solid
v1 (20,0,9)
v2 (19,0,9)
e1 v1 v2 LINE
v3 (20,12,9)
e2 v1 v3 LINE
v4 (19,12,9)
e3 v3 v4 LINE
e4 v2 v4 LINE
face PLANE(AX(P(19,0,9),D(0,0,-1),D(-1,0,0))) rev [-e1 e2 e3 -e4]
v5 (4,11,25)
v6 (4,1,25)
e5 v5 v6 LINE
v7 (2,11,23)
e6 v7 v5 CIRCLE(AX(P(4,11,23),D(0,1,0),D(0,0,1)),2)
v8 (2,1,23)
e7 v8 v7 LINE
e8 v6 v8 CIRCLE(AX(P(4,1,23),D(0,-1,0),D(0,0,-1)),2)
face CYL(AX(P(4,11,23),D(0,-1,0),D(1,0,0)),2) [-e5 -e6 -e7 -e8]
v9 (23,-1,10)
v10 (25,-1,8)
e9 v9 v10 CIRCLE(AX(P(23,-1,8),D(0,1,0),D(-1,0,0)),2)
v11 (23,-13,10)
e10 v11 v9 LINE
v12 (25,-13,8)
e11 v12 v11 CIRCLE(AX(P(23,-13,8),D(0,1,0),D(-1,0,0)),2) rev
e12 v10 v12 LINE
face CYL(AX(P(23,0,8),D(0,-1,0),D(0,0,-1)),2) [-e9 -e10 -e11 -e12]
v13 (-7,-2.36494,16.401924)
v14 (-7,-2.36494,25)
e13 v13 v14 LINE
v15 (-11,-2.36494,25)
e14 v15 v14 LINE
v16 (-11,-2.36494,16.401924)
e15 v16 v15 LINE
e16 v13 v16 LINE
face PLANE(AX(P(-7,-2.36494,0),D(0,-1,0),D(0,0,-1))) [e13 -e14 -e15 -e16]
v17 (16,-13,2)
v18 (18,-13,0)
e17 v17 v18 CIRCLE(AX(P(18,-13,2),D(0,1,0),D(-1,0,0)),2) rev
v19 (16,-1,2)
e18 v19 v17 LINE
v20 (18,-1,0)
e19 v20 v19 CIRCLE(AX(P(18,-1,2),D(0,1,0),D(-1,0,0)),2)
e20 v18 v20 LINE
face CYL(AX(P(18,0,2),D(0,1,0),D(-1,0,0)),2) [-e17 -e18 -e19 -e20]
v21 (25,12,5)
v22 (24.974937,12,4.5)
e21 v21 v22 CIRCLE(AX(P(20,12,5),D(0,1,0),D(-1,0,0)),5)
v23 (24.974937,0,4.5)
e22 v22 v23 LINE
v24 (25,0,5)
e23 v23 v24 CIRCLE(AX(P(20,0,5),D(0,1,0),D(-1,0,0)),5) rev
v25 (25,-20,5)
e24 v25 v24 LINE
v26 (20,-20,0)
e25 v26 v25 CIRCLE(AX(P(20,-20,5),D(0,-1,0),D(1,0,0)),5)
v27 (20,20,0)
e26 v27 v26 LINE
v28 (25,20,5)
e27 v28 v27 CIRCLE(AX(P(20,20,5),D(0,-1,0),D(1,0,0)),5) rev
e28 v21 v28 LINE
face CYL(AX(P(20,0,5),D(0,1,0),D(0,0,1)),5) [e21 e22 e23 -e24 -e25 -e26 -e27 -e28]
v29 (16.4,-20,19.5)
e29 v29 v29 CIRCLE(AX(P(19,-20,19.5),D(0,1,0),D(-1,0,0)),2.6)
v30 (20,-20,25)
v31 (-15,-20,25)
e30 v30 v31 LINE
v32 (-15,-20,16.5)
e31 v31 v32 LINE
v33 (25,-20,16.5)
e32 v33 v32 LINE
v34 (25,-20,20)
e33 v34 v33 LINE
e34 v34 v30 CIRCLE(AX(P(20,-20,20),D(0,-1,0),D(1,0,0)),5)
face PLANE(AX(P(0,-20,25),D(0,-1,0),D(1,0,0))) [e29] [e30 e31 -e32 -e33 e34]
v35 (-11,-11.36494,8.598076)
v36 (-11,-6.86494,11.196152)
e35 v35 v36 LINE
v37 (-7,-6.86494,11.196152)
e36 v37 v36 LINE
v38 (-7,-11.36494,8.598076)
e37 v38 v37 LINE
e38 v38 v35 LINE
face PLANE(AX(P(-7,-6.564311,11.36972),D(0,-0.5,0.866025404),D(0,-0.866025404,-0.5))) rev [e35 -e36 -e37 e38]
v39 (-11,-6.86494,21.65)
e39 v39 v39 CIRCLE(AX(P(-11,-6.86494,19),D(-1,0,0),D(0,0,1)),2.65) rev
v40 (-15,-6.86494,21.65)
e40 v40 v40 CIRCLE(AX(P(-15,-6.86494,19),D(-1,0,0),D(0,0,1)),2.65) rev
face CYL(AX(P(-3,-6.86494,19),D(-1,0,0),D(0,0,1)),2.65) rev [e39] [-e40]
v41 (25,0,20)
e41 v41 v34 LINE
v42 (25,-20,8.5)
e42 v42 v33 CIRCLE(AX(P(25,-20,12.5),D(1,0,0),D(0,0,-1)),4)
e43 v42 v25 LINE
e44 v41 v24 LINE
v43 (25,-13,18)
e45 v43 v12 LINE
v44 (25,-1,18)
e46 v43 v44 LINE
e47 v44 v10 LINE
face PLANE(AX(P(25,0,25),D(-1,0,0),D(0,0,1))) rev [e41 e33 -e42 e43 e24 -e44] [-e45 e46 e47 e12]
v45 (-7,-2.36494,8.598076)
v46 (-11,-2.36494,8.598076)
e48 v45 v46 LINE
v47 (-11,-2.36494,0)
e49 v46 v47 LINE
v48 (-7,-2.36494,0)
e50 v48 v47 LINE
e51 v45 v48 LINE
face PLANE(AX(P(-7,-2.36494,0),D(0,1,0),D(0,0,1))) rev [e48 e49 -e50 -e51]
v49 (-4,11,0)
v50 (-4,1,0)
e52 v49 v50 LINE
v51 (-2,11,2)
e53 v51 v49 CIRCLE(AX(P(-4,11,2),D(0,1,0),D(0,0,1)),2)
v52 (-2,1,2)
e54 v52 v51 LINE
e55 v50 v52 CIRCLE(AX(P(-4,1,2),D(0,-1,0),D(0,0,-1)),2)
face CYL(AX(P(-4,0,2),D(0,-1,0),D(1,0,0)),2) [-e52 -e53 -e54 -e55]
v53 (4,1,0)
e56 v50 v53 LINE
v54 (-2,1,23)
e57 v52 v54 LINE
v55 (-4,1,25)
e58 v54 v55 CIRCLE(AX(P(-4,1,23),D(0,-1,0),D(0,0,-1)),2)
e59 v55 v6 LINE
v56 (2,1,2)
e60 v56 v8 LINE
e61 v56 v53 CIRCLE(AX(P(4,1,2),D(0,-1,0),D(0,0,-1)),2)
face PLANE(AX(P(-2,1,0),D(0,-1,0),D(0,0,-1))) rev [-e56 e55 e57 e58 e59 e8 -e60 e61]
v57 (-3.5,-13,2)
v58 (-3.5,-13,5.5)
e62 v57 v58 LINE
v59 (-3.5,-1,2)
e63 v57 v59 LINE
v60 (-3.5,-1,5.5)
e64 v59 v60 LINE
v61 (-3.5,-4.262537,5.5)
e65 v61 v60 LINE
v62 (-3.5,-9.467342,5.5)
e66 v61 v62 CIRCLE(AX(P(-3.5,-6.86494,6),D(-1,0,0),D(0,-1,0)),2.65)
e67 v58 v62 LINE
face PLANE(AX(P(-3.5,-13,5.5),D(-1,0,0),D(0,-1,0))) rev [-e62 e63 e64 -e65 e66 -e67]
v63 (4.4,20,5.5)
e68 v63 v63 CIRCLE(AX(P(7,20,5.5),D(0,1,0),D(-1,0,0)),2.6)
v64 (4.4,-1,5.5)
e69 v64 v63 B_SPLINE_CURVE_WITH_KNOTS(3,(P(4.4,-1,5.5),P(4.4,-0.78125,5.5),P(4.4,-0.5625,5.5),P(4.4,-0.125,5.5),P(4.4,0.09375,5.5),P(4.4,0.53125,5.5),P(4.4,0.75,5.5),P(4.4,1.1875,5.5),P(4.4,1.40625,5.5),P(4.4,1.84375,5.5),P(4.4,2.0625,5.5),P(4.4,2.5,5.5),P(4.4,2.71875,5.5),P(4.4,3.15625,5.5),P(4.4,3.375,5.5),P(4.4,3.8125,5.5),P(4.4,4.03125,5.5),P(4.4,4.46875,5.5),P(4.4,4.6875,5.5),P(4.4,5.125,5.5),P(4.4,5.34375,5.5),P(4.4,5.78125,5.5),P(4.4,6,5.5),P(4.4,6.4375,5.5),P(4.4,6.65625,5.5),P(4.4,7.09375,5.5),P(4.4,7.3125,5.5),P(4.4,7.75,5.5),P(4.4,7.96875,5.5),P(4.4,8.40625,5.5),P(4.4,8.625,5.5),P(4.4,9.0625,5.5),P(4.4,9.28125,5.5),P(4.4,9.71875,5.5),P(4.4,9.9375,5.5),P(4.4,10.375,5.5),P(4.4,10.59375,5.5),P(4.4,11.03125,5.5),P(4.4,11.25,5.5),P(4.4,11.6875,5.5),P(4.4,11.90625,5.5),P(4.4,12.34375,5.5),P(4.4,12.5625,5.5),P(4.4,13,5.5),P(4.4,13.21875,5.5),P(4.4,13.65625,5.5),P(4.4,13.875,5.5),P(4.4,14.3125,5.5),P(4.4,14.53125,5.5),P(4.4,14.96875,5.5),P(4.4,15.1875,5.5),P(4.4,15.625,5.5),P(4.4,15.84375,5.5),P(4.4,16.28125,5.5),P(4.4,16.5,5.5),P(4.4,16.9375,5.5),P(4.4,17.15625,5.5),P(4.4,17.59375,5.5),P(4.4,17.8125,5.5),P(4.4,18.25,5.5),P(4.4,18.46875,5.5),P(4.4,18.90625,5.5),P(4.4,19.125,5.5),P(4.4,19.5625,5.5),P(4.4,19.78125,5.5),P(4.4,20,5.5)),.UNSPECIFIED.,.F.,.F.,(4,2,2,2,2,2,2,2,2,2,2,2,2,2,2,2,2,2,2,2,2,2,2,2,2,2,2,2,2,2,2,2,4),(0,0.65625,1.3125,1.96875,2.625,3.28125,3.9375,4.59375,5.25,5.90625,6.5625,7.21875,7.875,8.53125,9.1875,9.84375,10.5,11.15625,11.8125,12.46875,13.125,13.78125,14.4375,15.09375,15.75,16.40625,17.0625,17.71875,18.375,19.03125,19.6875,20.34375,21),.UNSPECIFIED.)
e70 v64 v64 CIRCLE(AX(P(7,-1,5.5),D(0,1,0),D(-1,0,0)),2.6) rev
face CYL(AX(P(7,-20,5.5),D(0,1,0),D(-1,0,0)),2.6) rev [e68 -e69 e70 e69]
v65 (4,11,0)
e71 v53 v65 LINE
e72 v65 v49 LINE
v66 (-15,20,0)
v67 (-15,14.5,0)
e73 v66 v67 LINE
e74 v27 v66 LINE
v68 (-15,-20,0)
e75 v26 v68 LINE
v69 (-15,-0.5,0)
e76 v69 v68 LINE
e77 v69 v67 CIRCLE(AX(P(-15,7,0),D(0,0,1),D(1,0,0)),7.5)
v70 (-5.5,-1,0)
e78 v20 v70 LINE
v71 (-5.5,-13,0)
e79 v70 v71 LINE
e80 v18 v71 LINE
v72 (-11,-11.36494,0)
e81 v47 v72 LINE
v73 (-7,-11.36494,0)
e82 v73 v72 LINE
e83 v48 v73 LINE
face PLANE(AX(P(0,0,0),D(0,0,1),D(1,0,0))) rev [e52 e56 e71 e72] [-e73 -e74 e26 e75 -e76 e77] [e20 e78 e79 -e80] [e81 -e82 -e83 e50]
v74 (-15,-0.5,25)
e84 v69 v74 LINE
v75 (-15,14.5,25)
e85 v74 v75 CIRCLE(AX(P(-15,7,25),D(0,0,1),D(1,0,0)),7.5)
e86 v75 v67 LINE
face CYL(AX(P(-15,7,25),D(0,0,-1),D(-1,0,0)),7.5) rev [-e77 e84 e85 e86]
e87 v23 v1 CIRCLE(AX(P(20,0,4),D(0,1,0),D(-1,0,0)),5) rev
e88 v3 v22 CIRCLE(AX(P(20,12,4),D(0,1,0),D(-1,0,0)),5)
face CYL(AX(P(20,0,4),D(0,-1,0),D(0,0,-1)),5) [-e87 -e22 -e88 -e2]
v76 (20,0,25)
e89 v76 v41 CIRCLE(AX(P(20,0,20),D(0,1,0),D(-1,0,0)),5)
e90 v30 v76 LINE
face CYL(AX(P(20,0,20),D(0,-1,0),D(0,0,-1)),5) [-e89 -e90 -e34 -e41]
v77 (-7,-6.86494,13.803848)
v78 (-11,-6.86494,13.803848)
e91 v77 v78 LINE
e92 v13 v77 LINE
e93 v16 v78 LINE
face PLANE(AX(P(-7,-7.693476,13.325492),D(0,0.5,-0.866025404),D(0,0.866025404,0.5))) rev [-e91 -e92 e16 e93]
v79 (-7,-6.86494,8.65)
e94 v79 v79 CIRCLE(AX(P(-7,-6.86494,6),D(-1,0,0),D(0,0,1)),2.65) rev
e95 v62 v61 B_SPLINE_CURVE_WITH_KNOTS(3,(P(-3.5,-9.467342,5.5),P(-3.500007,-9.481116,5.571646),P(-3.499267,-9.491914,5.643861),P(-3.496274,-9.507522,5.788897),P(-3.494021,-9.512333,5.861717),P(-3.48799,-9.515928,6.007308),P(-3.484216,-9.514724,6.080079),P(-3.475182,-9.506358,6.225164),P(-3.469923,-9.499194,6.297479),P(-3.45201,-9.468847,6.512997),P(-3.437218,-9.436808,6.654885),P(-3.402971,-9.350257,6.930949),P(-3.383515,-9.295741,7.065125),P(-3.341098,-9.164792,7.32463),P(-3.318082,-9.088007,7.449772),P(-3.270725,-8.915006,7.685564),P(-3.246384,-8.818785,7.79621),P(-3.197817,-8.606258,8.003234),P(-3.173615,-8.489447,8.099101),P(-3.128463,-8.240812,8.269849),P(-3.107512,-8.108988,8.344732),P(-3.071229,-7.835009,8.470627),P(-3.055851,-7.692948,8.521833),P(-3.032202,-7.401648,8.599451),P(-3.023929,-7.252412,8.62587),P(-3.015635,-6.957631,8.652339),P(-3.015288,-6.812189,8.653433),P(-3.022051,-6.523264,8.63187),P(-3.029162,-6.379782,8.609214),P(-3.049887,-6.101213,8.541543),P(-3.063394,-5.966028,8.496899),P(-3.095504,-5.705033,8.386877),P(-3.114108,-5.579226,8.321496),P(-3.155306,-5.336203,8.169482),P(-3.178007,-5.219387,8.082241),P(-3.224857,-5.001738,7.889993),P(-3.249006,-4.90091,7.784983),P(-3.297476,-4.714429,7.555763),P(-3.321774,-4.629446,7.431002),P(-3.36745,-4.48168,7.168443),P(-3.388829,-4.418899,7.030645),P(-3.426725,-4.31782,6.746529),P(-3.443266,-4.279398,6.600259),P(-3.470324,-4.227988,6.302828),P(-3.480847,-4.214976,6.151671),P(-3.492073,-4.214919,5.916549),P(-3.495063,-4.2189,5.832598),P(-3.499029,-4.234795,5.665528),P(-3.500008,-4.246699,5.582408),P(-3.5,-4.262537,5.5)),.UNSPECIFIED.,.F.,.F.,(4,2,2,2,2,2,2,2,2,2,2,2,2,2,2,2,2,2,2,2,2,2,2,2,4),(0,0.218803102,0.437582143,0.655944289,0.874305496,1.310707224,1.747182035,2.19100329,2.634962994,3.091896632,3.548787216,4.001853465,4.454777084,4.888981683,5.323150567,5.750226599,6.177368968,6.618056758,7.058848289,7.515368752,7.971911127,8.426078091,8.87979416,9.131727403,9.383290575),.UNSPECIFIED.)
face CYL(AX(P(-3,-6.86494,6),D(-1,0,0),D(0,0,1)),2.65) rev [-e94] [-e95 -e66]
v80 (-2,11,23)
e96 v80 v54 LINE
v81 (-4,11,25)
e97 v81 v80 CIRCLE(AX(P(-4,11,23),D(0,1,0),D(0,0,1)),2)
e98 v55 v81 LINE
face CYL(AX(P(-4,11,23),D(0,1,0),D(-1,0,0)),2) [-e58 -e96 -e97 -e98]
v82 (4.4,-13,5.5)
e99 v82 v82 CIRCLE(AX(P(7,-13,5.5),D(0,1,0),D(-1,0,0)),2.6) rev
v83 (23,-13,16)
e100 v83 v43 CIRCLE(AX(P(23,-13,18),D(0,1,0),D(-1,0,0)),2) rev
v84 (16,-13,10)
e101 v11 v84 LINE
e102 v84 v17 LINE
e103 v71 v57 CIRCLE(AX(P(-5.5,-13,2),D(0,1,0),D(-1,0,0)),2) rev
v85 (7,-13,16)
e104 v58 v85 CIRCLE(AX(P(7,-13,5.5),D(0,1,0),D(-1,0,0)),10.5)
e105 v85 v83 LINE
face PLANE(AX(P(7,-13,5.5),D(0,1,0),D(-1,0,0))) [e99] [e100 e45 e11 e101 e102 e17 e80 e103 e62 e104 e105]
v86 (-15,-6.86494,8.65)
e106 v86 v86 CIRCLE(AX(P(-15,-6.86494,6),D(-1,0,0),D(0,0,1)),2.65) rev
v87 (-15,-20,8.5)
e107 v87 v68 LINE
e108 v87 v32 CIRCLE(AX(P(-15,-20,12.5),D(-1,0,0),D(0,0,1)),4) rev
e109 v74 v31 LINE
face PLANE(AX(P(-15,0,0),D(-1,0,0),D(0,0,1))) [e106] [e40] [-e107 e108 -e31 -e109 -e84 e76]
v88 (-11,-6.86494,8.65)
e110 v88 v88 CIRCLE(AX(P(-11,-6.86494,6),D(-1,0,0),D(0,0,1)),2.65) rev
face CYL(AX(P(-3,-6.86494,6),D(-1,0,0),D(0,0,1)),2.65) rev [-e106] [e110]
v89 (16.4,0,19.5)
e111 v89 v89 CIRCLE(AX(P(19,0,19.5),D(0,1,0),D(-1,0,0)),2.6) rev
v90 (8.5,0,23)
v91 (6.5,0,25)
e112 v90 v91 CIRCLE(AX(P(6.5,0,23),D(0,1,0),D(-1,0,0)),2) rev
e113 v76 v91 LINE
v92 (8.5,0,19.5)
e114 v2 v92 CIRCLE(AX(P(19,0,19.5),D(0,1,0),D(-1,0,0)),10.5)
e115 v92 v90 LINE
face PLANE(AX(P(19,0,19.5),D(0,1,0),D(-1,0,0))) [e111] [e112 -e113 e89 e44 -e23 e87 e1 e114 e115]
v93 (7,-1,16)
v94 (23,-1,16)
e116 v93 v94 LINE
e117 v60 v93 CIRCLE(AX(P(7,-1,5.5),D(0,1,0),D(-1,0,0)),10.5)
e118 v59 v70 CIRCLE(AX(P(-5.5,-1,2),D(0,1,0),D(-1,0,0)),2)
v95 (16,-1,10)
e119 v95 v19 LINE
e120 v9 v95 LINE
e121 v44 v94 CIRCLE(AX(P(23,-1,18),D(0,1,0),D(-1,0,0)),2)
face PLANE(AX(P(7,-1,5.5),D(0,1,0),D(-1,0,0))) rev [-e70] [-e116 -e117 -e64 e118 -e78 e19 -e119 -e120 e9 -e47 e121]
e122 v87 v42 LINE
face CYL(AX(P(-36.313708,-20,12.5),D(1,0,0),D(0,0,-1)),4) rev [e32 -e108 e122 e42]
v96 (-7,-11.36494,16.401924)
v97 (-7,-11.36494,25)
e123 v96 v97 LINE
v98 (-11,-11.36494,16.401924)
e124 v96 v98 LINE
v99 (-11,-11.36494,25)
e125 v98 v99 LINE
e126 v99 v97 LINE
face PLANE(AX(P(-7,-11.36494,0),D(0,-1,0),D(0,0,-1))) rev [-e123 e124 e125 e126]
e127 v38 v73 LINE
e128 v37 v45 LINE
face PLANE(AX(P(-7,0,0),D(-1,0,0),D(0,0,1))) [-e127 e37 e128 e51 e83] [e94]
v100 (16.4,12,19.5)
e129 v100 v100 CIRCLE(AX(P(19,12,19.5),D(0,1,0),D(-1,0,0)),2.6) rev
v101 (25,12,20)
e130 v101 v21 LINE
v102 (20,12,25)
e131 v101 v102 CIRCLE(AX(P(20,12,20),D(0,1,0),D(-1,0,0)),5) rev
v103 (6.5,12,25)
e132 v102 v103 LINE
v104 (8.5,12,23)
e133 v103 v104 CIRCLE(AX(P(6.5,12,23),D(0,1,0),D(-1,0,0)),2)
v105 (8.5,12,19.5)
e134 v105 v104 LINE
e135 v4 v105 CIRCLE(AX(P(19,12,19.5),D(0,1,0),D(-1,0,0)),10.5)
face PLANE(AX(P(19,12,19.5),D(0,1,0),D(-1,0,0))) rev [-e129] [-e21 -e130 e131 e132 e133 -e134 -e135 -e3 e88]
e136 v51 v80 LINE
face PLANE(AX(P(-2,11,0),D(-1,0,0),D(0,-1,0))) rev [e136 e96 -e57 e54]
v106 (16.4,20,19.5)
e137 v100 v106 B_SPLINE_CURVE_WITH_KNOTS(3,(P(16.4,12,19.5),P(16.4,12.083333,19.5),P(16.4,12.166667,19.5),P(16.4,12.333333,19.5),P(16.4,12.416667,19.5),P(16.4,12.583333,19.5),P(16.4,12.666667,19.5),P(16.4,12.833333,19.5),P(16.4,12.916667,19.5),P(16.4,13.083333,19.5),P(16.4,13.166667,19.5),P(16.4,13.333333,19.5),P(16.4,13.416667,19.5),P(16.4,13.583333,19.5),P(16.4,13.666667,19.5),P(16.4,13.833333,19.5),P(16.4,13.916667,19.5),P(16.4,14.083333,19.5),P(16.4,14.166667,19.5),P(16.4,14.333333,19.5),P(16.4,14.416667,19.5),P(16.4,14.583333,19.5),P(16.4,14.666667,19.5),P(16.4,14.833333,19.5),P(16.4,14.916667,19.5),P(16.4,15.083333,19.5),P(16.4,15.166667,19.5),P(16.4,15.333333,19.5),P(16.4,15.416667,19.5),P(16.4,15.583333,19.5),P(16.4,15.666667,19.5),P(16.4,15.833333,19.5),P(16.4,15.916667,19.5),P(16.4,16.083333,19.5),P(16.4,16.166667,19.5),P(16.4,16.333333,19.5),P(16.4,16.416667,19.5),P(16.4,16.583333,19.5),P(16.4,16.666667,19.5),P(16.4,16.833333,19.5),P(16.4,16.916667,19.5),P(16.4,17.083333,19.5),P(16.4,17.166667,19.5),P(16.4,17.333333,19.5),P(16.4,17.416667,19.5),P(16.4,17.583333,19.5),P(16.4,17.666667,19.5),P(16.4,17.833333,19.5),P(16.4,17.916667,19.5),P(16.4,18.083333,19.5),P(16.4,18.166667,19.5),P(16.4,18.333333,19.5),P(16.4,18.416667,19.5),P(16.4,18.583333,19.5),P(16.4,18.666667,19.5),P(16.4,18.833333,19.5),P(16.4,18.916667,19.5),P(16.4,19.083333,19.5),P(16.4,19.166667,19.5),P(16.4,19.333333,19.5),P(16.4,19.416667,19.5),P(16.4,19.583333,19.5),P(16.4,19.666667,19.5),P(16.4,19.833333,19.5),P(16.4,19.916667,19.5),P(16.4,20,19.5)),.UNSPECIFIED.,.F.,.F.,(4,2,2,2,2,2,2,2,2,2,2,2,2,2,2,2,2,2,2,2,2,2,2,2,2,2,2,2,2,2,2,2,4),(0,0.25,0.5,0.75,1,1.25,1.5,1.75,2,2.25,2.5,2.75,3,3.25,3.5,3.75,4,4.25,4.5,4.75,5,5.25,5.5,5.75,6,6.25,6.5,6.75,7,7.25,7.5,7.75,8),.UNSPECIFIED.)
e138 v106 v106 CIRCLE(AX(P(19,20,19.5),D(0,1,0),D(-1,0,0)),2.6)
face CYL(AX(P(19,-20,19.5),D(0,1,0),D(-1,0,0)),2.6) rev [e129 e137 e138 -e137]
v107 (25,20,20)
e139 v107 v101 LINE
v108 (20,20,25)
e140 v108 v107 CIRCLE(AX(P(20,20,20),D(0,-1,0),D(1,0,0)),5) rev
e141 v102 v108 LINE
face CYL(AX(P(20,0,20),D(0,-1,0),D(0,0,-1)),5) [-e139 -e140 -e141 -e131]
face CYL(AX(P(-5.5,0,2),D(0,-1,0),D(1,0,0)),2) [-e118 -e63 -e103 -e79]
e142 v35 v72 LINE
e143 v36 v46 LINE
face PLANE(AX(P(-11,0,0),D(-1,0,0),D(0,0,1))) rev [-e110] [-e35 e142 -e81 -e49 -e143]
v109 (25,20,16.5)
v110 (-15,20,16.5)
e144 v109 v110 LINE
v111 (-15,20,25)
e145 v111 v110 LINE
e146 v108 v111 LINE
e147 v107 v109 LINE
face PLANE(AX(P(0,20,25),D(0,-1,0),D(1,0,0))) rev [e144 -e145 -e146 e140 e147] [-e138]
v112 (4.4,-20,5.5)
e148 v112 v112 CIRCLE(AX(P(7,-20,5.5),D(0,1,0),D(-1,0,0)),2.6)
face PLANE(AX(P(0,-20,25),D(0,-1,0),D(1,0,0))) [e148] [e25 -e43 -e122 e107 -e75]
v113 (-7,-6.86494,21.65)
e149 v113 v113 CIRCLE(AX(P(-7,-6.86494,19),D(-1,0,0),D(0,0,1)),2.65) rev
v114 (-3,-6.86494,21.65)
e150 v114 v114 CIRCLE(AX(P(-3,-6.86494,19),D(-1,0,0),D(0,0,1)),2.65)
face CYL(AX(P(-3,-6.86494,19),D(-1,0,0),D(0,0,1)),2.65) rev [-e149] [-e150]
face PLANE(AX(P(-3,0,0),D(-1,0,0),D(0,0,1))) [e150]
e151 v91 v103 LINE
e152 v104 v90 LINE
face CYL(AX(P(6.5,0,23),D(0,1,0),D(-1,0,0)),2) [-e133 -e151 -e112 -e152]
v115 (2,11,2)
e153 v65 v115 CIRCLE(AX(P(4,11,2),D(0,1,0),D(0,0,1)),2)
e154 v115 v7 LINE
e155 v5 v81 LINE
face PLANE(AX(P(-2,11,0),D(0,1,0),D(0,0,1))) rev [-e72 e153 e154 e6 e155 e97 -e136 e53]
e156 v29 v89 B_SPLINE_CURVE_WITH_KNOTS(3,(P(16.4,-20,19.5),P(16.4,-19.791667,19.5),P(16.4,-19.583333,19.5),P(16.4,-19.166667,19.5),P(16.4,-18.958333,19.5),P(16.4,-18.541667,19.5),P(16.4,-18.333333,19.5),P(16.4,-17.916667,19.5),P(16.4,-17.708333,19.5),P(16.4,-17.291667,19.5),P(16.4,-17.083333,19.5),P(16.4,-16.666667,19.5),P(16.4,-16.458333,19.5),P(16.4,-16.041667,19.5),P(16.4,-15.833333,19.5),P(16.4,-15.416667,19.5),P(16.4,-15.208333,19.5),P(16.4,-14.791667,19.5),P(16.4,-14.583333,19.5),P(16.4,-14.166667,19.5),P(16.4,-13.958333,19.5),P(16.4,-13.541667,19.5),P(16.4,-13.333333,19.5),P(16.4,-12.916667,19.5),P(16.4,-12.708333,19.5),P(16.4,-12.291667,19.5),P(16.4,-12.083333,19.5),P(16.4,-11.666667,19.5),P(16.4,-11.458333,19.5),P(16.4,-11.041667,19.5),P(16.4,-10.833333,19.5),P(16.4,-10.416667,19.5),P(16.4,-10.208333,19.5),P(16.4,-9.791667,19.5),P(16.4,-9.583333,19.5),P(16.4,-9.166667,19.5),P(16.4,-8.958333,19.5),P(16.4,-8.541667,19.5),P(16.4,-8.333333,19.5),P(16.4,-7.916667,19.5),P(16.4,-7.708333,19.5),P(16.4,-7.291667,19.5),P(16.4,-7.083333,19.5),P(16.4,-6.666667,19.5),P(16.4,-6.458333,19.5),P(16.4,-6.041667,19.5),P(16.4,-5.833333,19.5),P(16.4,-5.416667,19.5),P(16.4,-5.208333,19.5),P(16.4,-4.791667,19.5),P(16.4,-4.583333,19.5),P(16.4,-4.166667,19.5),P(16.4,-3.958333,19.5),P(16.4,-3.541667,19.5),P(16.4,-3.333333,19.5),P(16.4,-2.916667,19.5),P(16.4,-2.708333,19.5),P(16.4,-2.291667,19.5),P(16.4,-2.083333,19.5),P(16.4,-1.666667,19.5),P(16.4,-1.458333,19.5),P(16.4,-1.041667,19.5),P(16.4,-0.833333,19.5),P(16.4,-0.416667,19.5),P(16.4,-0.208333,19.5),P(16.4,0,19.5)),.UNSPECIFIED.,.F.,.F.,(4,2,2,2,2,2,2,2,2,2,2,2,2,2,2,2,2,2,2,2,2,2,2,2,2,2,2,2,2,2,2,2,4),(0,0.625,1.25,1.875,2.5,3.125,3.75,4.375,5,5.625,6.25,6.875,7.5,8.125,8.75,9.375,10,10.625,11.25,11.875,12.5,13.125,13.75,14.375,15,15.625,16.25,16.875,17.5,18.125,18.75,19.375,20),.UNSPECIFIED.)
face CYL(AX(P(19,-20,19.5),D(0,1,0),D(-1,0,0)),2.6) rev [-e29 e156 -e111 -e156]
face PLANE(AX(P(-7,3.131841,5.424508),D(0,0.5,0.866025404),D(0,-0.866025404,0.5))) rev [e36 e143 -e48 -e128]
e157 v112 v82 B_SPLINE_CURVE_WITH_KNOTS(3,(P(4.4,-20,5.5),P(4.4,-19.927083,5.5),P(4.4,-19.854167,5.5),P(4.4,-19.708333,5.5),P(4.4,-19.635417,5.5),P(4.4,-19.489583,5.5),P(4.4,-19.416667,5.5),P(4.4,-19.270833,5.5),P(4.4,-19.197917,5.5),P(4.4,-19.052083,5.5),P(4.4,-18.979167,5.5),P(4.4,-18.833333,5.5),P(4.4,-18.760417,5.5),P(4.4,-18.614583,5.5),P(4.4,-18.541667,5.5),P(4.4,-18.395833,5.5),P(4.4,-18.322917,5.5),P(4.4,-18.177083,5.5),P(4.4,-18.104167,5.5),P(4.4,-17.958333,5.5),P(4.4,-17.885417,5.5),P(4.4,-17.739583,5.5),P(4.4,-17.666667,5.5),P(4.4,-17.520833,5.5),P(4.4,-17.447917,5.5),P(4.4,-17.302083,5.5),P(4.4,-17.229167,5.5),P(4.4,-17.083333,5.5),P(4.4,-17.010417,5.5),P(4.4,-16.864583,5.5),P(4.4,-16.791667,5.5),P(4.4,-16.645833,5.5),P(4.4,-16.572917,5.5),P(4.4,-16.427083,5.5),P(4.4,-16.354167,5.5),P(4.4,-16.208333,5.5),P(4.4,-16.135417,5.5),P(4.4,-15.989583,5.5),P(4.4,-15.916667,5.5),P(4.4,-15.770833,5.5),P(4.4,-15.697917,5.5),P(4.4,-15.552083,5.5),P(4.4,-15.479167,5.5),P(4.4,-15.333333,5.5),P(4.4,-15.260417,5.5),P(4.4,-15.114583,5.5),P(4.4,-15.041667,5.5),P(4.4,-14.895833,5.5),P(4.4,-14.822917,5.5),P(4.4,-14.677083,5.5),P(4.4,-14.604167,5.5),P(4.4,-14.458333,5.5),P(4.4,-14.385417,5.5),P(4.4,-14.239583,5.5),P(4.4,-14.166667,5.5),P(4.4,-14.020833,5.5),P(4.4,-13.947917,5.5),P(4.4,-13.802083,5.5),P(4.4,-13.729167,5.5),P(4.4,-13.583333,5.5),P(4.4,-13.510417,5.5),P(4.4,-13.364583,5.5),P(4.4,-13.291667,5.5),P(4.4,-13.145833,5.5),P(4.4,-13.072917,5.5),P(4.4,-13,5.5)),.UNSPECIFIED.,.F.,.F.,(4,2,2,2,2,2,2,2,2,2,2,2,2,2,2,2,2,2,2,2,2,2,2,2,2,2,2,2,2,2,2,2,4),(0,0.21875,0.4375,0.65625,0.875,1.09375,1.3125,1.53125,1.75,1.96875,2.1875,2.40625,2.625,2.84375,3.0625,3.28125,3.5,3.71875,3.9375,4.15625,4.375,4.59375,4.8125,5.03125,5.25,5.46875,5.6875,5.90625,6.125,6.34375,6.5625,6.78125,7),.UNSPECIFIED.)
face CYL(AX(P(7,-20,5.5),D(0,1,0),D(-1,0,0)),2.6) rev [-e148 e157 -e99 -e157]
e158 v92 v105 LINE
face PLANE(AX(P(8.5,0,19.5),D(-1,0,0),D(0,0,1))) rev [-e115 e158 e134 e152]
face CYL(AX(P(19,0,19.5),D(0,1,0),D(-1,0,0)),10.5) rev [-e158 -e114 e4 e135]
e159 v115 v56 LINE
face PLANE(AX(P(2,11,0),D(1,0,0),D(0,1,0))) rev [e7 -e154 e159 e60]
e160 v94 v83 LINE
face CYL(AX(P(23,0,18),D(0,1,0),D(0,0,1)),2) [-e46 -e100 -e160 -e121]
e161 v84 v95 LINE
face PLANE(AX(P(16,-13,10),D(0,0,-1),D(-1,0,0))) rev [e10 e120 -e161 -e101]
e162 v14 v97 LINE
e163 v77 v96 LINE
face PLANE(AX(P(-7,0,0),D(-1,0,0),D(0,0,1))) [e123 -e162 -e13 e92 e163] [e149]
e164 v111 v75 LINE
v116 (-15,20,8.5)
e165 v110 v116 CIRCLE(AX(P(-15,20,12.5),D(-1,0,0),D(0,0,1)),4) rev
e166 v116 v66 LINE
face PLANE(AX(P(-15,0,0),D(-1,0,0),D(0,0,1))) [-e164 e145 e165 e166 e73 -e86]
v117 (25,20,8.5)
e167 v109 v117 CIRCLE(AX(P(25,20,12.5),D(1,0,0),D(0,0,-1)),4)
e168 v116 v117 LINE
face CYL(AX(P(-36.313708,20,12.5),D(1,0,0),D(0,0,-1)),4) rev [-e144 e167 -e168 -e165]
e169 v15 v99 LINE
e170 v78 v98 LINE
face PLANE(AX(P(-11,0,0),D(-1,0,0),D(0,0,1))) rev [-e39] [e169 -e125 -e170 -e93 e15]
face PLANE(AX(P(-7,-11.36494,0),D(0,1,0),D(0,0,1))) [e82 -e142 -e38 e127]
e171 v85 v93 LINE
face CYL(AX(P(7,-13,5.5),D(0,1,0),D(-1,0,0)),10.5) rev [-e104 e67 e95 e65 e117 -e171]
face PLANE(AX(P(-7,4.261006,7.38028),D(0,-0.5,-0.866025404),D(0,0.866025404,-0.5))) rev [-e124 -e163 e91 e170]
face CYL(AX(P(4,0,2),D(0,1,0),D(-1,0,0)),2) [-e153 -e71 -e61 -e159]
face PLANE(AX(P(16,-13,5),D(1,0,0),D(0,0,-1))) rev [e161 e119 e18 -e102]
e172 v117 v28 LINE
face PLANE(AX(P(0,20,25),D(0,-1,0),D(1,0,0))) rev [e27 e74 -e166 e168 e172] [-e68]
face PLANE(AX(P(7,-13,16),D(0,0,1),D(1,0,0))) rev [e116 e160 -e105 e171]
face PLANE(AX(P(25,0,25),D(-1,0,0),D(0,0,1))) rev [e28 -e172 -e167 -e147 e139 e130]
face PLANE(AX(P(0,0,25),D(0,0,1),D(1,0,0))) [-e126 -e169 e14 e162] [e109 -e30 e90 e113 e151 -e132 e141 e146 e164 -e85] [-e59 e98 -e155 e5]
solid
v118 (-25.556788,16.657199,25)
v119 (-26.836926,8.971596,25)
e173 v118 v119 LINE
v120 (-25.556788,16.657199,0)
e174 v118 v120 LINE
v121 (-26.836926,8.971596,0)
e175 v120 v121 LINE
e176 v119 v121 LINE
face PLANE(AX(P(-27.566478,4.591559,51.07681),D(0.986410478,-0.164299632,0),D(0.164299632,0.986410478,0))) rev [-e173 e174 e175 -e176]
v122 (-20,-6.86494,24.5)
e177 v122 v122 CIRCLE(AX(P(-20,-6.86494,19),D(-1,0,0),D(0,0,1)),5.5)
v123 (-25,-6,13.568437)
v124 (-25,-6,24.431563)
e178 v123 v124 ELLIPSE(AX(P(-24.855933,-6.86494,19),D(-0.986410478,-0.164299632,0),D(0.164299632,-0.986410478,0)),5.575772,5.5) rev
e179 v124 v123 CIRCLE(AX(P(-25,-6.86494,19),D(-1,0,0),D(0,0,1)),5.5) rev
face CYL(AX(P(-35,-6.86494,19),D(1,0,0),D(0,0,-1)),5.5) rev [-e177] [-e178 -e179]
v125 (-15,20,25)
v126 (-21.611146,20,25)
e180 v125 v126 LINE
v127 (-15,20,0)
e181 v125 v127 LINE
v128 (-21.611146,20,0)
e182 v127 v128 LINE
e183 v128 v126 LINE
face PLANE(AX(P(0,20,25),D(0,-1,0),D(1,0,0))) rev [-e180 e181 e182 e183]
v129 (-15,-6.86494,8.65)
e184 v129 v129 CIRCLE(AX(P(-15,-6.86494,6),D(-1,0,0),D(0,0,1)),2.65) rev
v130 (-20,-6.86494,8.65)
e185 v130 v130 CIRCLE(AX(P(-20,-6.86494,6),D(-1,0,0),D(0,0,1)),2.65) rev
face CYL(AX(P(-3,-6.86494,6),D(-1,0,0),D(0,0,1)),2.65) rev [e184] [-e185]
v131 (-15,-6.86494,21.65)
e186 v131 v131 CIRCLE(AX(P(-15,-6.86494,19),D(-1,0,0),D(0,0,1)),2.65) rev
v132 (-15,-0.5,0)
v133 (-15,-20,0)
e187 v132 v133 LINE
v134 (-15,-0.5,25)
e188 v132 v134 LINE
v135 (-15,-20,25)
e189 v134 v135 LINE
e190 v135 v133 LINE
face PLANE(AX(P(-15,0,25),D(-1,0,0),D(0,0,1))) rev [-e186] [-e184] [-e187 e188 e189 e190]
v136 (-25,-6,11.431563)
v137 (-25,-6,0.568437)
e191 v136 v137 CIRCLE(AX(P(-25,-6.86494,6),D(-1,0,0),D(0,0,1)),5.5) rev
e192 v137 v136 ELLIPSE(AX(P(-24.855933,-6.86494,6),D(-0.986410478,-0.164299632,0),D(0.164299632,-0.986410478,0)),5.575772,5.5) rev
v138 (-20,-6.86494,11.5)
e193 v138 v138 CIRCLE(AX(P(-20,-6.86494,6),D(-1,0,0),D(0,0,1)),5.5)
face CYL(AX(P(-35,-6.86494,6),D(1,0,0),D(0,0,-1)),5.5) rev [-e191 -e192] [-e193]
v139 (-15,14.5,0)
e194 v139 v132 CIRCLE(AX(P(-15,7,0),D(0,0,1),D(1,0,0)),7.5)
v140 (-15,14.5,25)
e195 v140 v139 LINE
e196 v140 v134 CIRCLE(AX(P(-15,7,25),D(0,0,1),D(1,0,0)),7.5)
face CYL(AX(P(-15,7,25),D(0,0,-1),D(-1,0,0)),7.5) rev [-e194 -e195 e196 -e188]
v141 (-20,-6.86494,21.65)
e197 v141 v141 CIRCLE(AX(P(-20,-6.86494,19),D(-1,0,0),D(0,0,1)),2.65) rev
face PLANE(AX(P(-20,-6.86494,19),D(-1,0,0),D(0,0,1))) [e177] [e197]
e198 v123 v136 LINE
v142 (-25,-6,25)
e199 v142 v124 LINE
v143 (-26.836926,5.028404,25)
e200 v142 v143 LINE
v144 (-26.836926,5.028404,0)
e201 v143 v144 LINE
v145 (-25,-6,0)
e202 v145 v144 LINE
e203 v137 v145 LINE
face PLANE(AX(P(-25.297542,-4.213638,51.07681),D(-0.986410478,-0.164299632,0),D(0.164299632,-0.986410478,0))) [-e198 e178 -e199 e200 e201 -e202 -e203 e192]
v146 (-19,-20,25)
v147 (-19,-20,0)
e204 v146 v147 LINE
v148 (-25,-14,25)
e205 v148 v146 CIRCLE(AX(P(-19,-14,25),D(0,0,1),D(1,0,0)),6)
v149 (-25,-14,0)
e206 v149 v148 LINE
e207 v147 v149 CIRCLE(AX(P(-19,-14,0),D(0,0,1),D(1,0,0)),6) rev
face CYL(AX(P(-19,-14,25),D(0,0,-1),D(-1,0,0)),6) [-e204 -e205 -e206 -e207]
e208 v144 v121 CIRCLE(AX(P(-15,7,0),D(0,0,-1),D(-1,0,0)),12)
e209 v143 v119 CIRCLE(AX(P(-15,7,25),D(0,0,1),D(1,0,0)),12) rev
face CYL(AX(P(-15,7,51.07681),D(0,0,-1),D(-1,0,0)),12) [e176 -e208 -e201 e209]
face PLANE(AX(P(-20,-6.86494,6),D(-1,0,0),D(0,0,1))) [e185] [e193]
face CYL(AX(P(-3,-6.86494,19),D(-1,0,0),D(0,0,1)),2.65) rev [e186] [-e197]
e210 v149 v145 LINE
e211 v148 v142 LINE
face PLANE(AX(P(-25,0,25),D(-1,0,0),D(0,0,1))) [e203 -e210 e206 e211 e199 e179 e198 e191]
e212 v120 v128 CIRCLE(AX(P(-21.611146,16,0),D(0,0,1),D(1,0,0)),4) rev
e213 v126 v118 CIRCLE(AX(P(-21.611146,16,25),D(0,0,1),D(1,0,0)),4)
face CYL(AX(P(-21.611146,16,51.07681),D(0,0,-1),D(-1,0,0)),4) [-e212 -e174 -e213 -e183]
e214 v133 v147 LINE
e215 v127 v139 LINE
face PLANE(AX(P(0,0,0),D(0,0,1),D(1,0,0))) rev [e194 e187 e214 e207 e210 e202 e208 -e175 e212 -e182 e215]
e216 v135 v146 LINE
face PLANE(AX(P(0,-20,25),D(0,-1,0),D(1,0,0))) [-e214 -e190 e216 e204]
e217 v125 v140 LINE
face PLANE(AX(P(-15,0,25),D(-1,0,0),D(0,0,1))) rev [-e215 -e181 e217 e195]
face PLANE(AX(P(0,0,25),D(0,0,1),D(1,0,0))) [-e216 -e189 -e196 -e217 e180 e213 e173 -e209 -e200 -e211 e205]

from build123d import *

# Parameters (mm, degrees)
SKETCH1_W               = 50
SKETCH1_H               = 40
SKETCH1_R               = 7.5
BOSS_EXTRUDE1_DEPTH     = 25
SKETCH2_R               = 4
CUT_EXTRUDE1_DEPTH      = 40
SKETCH4_R               = 2.6
CUT_EXTRUDE2_DEPTH      = 54.38539126
BOSS_EXTRUDE2_DEPTH     = 25
SKETCH6_W               = 4
SKETCH6_H               = 10
CUT_EXTRUDE3_DEPTH      = 42.880783183
CUT_EXTRUDE4_START      = -8
CUT_EXTRUDE4_DEPTH      = 12
CUT_EXTRUDE5_START      = -21
CUT_EXTRUDE5_DEPTH      = 12
SKETCH12_R              = 2.65
CUT_EXTRUDE6_DEPTH      = 22
CUT_EXTRUDE7_START      = -14
CUT_EXTRUDE7_DEPTH      = 4
CUT_EXTRUDE8_DEPTH      = 10
CUT_EXTRUDE8_DEPTH_BACK = 5
SKETCH14_R              = 5.5
FILLET1_R               = 5
FILLET2_R               = 2
FILLET3_R               = 4
FILLET4_R               = 5
FILLET5_R               = 6


with BuildPart() as part:
    # Sketch1 → Boss-Extrude1 (new body)
    with BuildSketch(Plane.XY):
        Rectangle(SKETCH1_W, SKETCH1_H)
        with Locations((-15, 7)):
            Circle(SKETCH1_R, mode=Mode.SUBTRACT)
    extrude(amount=BOSS_EXTRUDE1_DEPTH)

    # Sketch2 → Cut-Extrude1 (cut)
    with BuildSketch(Plane(origin=(25, 0, 0), x_dir=(0, 0, -1), z_dir=(1, 0, 0))):
        with Locations((-12.5, 20)):
            Circle(SKETCH2_R)
        with Locations((-12.5, -20)):
            Circle(SKETCH2_R)
    extrude(amount=-CUT_EXTRUDE1_DEPTH, mode=Mode.SUBTRACT)

    # Sketch4 → Cut-Extrude2 (cut, through all)
    with BuildSketch(Plane(origin=(0, 20, 0), x_dir=(1, 0, 0), z_dir=(0, 1, 0))):
        with Locations(Location((7, -5.5, 0), (0, 0, 180))):
            Circle(SKETCH4_R)
        with Locations(Location((19, -19.5, 0), (0, 0, 180))):
            Circle(SKETCH4_R)
    extrude(amount=-CUT_EXTRUDE2_DEPTH, mode=Mode.SUBTRACT)

    # Sketch17 → Boss-Extrude2 (add)
    with BuildSketch(Plane(origin=(0, 0, 0), x_dir=(-1, 0, 0), z_dir=(0, 0, -1))):
        with BuildLine():
            ThreePointArc((26.836925734, 5.028404411), (26.164478755, 2.600634803), (25, 0.366750419))
            Line((25, 0.366750419), (25, -6))
            Line((25, -6), (26.836925734, 5.028404411))
        make_face()
        with BuildLine():
            ThreePointArc((27, 7), (26.959161944, 7.989164089), (26.836925734, 8.971595589))
            ThreePointArc((26.836925734, 8.971595589), (26.164478755, 11.399365197), (25, 13.633249581))
            Line((25, 13.633249581), (25, 0.366750419))
            ThreePointArc((25, 0.366750419), (26.164478755, 2.600634803), (26.836925734, 5.028404411))
            ThreePointArc((26.836925734, 5.028404411), (26.959161944, 6.010835911), (27, 7))
        make_face()
        with BuildLine():
            Line((26.836925734, 8.971595589), (25, 20))
            Line((25, 20), (25, 13.633249581))
            ThreePointArc((25, 13.633249581), (26.164478755, 11.399365197), (26.836925734, 8.971595589))
        make_face()
    extrude(amount=-BOSS_EXTRUDE2_DEPTH)

    # Sketch6 → Cut-Extrude3 (cut, through all)
    with BuildSketch(Plane.XY.offset(25)):
        with Locations((0, 6)):
            Rectangle(SKETCH6_W, SKETCH6_H)
    extrude(amount=-CUT_EXTRUDE3_DEPTH, mode=Mode.SUBTRACT)

    # Sketch8 → Cut-Extrude4 (cut)
    with BuildSketch(Plane(origin=(0, 20, 0), x_dir=(1, 0, 0), z_dir=(0, 1, 0)).offset(CUT_EXTRUDE4_START)):
        with BuildLine():
            Line((19, -9), (29.5, -9))
            Line((29.5, -9), (29.5, -30))
            Line((29.5, -30), (19, -30))
            Line((19, -30), (8.5, -30))
            Line((8.5, -30), (8.5, -19.5))
            ThreePointArc((8.5, -19.5), (11.575378798, -12.075378798), (19, -9))
        make_face()
    extrude(amount=-CUT_EXTRUDE4_DEPTH, mode=Mode.SUBTRACT)

    # Sketch11 → Cut-Extrude5 (cut)
    with BuildSketch(Plane(origin=(0, 20, 0), x_dir=(1, 0, 0), z_dir=(0, 1, 0)).offset(CUT_EXTRUDE5_START)):
        with BuildLine():
            Line((16, -5), (16, -10))
            Line((16, -10), (26.226618187, -10))
            Line((26.226618187, -10), (26.226618187, -16))
            Line((26.226618187, -16), (7, -16))
            ThreePointArc((7, -16), (-0.424621202, -12.924621202), (-3.5, -5.5))
            Line((-3.5, -5.5), (-3.5, 3.5))
            Line((-3.5, 3.5), (16, 3.5))
            Line((16, 3.5), (16, -5))
        make_face()
    extrude(amount=-CUT_EXTRUDE5_DEPTH, mode=Mode.SUBTRACT)

    # Sketch12 → Cut-Extrude6 (cut)
    with BuildSketch(Plane.ZY.offset(25)):
        with Locations((19, -6.86493963)):
            Circle(SKETCH12_R)
        with Locations(Location((6, -6.86493963, 0), (0, 0, 19.049949226))):
            Circle(SKETCH12_R)
    extrude(amount=-CUT_EXTRUDE6_DEPTH, mode=Mode.SUBTRACT)

    # Sketch13 → Cut-Extrude7 (cut)
    with BuildSketch(Plane.ZY.offset(25).offset(CUT_EXTRUDE7_START)):
        Polygon((4.529172568, -11.36493963), (8.598076211, -11.36493963), (11.196152423, -6.86493963), (8.598076211, -2.36493963), (3.819451615, -2.36493963), (-1.875046018, -2.36493963), (-1.875046018, -11.36493963), align=None)
        Polygon((21.598076211, -2.36493963), (16.401923789, -2.36493963), (13.803847577, -6.86493963), (16.401923789, -11.36493963), (21.845916949, -11.36493963), (28.602568589, -11.36493963), (28.602568589, -2.36493963), align=None)
    extrude(amount=-CUT_EXTRUDE7_DEPTH, mode=Mode.SUBTRACT)

    # Sketch14 → Cut-Extrude8 (cut, two sides: drawn at the far end of the back side and taken through both)
    with BuildSketch(Plane.ZY.offset(25).offset(-CUT_EXTRUDE8_DEPTH_BACK)):
        with Locations(Location((6, -6.86493963, 0), (0, 0, 170.952005971))):
            Circle(SKETCH14_R)
        with Locations(Location((19, -6.86493963, 0), (0, 0, 170.952005971))):
            Circle(SKETCH14_R)
    extrude(amount=CUT_EXTRUDE8_DEPTH + CUT_EXTRUDE8_DEPTH_BACK, mode=Mode.SUBTRACT)


with BuildPart() as body_2:
    # Split1: the piece on the far side of the plane
    add(part.part)
    split(bisect_by=Plane(origin=(-15, 0, 0), x_dir=(0, 0, -1), z_dir=(-1, 0, 0)), keep=Keep.BOTTOM)

    # Fillet1
    fillet1_edges = [body_2.edges().sort_by_distance(p)[0] for p in [
        (25, 0, 0),
        (25, 16, 25),
        (25, -10, 25),
    ]]
    fillet(fillet1_edges, radius=FILLET1_R)

    # Fillet2
    fillet2_edges = [body_2.edges().sort_by_distance(p)[0] for p in [
        (2, 6, 25),
        (-2, 6, 25),
        (2, 6, 0),
        (-2, 6, 0),
        (8.5, 6, 25),
        (16, -7, 0),
        (-3.5, -7, 0),
        (25, -7, 16),
        (25, -7, 10),
    ]]
    fillet(fillet2_edges, radius=FILLET2_R)

    # Fillet4
    # the kernel refuses this fillet: 5 mm, written as the material it takes off along each edge
    with BuildSketch(Plane(origin=(25, 0, 9), x_dir=(-1, 0, 0), z_dir=(0, 1, 0))) as fillet4_piece_1:
        with BuildLine():
            CenterArc((FILLET4_R, -FILLET4_R), FILLET4_R, 90, 90)
            Line((0, -FILLET4_R), (0, 0))
            Line((0, 0), (FILLET4_R, 0))
        make_face()
    extrude(amount=12, mode=Mode.SUBTRACT)


with BuildPart() as part_1:
    add(part.part)

    # Split1
    split(bisect_by=Plane(origin=(-15, 0, 0), x_dir=(0, 0, -1), z_dir=(-1, 0, 0)), keep=Keep.TOP)

    # Fillet3
    fillet3_edges = [part_1.edges().sort_by_distance(p)[0] for p in [
        (-25, 20, 12.5),
    ]]
    fillet(fillet3_edges, radius=FILLET3_R)

    # Fillet5
    fillet5_edges = [part_1.edges().sort_by_distance(p)[0] for p in [
        (-25, -20, 12.5),
    ]]
    fillet(fillet5_edges, radius=FILLET5_R)


solid = Compound([body_2.part, part_1.part])
